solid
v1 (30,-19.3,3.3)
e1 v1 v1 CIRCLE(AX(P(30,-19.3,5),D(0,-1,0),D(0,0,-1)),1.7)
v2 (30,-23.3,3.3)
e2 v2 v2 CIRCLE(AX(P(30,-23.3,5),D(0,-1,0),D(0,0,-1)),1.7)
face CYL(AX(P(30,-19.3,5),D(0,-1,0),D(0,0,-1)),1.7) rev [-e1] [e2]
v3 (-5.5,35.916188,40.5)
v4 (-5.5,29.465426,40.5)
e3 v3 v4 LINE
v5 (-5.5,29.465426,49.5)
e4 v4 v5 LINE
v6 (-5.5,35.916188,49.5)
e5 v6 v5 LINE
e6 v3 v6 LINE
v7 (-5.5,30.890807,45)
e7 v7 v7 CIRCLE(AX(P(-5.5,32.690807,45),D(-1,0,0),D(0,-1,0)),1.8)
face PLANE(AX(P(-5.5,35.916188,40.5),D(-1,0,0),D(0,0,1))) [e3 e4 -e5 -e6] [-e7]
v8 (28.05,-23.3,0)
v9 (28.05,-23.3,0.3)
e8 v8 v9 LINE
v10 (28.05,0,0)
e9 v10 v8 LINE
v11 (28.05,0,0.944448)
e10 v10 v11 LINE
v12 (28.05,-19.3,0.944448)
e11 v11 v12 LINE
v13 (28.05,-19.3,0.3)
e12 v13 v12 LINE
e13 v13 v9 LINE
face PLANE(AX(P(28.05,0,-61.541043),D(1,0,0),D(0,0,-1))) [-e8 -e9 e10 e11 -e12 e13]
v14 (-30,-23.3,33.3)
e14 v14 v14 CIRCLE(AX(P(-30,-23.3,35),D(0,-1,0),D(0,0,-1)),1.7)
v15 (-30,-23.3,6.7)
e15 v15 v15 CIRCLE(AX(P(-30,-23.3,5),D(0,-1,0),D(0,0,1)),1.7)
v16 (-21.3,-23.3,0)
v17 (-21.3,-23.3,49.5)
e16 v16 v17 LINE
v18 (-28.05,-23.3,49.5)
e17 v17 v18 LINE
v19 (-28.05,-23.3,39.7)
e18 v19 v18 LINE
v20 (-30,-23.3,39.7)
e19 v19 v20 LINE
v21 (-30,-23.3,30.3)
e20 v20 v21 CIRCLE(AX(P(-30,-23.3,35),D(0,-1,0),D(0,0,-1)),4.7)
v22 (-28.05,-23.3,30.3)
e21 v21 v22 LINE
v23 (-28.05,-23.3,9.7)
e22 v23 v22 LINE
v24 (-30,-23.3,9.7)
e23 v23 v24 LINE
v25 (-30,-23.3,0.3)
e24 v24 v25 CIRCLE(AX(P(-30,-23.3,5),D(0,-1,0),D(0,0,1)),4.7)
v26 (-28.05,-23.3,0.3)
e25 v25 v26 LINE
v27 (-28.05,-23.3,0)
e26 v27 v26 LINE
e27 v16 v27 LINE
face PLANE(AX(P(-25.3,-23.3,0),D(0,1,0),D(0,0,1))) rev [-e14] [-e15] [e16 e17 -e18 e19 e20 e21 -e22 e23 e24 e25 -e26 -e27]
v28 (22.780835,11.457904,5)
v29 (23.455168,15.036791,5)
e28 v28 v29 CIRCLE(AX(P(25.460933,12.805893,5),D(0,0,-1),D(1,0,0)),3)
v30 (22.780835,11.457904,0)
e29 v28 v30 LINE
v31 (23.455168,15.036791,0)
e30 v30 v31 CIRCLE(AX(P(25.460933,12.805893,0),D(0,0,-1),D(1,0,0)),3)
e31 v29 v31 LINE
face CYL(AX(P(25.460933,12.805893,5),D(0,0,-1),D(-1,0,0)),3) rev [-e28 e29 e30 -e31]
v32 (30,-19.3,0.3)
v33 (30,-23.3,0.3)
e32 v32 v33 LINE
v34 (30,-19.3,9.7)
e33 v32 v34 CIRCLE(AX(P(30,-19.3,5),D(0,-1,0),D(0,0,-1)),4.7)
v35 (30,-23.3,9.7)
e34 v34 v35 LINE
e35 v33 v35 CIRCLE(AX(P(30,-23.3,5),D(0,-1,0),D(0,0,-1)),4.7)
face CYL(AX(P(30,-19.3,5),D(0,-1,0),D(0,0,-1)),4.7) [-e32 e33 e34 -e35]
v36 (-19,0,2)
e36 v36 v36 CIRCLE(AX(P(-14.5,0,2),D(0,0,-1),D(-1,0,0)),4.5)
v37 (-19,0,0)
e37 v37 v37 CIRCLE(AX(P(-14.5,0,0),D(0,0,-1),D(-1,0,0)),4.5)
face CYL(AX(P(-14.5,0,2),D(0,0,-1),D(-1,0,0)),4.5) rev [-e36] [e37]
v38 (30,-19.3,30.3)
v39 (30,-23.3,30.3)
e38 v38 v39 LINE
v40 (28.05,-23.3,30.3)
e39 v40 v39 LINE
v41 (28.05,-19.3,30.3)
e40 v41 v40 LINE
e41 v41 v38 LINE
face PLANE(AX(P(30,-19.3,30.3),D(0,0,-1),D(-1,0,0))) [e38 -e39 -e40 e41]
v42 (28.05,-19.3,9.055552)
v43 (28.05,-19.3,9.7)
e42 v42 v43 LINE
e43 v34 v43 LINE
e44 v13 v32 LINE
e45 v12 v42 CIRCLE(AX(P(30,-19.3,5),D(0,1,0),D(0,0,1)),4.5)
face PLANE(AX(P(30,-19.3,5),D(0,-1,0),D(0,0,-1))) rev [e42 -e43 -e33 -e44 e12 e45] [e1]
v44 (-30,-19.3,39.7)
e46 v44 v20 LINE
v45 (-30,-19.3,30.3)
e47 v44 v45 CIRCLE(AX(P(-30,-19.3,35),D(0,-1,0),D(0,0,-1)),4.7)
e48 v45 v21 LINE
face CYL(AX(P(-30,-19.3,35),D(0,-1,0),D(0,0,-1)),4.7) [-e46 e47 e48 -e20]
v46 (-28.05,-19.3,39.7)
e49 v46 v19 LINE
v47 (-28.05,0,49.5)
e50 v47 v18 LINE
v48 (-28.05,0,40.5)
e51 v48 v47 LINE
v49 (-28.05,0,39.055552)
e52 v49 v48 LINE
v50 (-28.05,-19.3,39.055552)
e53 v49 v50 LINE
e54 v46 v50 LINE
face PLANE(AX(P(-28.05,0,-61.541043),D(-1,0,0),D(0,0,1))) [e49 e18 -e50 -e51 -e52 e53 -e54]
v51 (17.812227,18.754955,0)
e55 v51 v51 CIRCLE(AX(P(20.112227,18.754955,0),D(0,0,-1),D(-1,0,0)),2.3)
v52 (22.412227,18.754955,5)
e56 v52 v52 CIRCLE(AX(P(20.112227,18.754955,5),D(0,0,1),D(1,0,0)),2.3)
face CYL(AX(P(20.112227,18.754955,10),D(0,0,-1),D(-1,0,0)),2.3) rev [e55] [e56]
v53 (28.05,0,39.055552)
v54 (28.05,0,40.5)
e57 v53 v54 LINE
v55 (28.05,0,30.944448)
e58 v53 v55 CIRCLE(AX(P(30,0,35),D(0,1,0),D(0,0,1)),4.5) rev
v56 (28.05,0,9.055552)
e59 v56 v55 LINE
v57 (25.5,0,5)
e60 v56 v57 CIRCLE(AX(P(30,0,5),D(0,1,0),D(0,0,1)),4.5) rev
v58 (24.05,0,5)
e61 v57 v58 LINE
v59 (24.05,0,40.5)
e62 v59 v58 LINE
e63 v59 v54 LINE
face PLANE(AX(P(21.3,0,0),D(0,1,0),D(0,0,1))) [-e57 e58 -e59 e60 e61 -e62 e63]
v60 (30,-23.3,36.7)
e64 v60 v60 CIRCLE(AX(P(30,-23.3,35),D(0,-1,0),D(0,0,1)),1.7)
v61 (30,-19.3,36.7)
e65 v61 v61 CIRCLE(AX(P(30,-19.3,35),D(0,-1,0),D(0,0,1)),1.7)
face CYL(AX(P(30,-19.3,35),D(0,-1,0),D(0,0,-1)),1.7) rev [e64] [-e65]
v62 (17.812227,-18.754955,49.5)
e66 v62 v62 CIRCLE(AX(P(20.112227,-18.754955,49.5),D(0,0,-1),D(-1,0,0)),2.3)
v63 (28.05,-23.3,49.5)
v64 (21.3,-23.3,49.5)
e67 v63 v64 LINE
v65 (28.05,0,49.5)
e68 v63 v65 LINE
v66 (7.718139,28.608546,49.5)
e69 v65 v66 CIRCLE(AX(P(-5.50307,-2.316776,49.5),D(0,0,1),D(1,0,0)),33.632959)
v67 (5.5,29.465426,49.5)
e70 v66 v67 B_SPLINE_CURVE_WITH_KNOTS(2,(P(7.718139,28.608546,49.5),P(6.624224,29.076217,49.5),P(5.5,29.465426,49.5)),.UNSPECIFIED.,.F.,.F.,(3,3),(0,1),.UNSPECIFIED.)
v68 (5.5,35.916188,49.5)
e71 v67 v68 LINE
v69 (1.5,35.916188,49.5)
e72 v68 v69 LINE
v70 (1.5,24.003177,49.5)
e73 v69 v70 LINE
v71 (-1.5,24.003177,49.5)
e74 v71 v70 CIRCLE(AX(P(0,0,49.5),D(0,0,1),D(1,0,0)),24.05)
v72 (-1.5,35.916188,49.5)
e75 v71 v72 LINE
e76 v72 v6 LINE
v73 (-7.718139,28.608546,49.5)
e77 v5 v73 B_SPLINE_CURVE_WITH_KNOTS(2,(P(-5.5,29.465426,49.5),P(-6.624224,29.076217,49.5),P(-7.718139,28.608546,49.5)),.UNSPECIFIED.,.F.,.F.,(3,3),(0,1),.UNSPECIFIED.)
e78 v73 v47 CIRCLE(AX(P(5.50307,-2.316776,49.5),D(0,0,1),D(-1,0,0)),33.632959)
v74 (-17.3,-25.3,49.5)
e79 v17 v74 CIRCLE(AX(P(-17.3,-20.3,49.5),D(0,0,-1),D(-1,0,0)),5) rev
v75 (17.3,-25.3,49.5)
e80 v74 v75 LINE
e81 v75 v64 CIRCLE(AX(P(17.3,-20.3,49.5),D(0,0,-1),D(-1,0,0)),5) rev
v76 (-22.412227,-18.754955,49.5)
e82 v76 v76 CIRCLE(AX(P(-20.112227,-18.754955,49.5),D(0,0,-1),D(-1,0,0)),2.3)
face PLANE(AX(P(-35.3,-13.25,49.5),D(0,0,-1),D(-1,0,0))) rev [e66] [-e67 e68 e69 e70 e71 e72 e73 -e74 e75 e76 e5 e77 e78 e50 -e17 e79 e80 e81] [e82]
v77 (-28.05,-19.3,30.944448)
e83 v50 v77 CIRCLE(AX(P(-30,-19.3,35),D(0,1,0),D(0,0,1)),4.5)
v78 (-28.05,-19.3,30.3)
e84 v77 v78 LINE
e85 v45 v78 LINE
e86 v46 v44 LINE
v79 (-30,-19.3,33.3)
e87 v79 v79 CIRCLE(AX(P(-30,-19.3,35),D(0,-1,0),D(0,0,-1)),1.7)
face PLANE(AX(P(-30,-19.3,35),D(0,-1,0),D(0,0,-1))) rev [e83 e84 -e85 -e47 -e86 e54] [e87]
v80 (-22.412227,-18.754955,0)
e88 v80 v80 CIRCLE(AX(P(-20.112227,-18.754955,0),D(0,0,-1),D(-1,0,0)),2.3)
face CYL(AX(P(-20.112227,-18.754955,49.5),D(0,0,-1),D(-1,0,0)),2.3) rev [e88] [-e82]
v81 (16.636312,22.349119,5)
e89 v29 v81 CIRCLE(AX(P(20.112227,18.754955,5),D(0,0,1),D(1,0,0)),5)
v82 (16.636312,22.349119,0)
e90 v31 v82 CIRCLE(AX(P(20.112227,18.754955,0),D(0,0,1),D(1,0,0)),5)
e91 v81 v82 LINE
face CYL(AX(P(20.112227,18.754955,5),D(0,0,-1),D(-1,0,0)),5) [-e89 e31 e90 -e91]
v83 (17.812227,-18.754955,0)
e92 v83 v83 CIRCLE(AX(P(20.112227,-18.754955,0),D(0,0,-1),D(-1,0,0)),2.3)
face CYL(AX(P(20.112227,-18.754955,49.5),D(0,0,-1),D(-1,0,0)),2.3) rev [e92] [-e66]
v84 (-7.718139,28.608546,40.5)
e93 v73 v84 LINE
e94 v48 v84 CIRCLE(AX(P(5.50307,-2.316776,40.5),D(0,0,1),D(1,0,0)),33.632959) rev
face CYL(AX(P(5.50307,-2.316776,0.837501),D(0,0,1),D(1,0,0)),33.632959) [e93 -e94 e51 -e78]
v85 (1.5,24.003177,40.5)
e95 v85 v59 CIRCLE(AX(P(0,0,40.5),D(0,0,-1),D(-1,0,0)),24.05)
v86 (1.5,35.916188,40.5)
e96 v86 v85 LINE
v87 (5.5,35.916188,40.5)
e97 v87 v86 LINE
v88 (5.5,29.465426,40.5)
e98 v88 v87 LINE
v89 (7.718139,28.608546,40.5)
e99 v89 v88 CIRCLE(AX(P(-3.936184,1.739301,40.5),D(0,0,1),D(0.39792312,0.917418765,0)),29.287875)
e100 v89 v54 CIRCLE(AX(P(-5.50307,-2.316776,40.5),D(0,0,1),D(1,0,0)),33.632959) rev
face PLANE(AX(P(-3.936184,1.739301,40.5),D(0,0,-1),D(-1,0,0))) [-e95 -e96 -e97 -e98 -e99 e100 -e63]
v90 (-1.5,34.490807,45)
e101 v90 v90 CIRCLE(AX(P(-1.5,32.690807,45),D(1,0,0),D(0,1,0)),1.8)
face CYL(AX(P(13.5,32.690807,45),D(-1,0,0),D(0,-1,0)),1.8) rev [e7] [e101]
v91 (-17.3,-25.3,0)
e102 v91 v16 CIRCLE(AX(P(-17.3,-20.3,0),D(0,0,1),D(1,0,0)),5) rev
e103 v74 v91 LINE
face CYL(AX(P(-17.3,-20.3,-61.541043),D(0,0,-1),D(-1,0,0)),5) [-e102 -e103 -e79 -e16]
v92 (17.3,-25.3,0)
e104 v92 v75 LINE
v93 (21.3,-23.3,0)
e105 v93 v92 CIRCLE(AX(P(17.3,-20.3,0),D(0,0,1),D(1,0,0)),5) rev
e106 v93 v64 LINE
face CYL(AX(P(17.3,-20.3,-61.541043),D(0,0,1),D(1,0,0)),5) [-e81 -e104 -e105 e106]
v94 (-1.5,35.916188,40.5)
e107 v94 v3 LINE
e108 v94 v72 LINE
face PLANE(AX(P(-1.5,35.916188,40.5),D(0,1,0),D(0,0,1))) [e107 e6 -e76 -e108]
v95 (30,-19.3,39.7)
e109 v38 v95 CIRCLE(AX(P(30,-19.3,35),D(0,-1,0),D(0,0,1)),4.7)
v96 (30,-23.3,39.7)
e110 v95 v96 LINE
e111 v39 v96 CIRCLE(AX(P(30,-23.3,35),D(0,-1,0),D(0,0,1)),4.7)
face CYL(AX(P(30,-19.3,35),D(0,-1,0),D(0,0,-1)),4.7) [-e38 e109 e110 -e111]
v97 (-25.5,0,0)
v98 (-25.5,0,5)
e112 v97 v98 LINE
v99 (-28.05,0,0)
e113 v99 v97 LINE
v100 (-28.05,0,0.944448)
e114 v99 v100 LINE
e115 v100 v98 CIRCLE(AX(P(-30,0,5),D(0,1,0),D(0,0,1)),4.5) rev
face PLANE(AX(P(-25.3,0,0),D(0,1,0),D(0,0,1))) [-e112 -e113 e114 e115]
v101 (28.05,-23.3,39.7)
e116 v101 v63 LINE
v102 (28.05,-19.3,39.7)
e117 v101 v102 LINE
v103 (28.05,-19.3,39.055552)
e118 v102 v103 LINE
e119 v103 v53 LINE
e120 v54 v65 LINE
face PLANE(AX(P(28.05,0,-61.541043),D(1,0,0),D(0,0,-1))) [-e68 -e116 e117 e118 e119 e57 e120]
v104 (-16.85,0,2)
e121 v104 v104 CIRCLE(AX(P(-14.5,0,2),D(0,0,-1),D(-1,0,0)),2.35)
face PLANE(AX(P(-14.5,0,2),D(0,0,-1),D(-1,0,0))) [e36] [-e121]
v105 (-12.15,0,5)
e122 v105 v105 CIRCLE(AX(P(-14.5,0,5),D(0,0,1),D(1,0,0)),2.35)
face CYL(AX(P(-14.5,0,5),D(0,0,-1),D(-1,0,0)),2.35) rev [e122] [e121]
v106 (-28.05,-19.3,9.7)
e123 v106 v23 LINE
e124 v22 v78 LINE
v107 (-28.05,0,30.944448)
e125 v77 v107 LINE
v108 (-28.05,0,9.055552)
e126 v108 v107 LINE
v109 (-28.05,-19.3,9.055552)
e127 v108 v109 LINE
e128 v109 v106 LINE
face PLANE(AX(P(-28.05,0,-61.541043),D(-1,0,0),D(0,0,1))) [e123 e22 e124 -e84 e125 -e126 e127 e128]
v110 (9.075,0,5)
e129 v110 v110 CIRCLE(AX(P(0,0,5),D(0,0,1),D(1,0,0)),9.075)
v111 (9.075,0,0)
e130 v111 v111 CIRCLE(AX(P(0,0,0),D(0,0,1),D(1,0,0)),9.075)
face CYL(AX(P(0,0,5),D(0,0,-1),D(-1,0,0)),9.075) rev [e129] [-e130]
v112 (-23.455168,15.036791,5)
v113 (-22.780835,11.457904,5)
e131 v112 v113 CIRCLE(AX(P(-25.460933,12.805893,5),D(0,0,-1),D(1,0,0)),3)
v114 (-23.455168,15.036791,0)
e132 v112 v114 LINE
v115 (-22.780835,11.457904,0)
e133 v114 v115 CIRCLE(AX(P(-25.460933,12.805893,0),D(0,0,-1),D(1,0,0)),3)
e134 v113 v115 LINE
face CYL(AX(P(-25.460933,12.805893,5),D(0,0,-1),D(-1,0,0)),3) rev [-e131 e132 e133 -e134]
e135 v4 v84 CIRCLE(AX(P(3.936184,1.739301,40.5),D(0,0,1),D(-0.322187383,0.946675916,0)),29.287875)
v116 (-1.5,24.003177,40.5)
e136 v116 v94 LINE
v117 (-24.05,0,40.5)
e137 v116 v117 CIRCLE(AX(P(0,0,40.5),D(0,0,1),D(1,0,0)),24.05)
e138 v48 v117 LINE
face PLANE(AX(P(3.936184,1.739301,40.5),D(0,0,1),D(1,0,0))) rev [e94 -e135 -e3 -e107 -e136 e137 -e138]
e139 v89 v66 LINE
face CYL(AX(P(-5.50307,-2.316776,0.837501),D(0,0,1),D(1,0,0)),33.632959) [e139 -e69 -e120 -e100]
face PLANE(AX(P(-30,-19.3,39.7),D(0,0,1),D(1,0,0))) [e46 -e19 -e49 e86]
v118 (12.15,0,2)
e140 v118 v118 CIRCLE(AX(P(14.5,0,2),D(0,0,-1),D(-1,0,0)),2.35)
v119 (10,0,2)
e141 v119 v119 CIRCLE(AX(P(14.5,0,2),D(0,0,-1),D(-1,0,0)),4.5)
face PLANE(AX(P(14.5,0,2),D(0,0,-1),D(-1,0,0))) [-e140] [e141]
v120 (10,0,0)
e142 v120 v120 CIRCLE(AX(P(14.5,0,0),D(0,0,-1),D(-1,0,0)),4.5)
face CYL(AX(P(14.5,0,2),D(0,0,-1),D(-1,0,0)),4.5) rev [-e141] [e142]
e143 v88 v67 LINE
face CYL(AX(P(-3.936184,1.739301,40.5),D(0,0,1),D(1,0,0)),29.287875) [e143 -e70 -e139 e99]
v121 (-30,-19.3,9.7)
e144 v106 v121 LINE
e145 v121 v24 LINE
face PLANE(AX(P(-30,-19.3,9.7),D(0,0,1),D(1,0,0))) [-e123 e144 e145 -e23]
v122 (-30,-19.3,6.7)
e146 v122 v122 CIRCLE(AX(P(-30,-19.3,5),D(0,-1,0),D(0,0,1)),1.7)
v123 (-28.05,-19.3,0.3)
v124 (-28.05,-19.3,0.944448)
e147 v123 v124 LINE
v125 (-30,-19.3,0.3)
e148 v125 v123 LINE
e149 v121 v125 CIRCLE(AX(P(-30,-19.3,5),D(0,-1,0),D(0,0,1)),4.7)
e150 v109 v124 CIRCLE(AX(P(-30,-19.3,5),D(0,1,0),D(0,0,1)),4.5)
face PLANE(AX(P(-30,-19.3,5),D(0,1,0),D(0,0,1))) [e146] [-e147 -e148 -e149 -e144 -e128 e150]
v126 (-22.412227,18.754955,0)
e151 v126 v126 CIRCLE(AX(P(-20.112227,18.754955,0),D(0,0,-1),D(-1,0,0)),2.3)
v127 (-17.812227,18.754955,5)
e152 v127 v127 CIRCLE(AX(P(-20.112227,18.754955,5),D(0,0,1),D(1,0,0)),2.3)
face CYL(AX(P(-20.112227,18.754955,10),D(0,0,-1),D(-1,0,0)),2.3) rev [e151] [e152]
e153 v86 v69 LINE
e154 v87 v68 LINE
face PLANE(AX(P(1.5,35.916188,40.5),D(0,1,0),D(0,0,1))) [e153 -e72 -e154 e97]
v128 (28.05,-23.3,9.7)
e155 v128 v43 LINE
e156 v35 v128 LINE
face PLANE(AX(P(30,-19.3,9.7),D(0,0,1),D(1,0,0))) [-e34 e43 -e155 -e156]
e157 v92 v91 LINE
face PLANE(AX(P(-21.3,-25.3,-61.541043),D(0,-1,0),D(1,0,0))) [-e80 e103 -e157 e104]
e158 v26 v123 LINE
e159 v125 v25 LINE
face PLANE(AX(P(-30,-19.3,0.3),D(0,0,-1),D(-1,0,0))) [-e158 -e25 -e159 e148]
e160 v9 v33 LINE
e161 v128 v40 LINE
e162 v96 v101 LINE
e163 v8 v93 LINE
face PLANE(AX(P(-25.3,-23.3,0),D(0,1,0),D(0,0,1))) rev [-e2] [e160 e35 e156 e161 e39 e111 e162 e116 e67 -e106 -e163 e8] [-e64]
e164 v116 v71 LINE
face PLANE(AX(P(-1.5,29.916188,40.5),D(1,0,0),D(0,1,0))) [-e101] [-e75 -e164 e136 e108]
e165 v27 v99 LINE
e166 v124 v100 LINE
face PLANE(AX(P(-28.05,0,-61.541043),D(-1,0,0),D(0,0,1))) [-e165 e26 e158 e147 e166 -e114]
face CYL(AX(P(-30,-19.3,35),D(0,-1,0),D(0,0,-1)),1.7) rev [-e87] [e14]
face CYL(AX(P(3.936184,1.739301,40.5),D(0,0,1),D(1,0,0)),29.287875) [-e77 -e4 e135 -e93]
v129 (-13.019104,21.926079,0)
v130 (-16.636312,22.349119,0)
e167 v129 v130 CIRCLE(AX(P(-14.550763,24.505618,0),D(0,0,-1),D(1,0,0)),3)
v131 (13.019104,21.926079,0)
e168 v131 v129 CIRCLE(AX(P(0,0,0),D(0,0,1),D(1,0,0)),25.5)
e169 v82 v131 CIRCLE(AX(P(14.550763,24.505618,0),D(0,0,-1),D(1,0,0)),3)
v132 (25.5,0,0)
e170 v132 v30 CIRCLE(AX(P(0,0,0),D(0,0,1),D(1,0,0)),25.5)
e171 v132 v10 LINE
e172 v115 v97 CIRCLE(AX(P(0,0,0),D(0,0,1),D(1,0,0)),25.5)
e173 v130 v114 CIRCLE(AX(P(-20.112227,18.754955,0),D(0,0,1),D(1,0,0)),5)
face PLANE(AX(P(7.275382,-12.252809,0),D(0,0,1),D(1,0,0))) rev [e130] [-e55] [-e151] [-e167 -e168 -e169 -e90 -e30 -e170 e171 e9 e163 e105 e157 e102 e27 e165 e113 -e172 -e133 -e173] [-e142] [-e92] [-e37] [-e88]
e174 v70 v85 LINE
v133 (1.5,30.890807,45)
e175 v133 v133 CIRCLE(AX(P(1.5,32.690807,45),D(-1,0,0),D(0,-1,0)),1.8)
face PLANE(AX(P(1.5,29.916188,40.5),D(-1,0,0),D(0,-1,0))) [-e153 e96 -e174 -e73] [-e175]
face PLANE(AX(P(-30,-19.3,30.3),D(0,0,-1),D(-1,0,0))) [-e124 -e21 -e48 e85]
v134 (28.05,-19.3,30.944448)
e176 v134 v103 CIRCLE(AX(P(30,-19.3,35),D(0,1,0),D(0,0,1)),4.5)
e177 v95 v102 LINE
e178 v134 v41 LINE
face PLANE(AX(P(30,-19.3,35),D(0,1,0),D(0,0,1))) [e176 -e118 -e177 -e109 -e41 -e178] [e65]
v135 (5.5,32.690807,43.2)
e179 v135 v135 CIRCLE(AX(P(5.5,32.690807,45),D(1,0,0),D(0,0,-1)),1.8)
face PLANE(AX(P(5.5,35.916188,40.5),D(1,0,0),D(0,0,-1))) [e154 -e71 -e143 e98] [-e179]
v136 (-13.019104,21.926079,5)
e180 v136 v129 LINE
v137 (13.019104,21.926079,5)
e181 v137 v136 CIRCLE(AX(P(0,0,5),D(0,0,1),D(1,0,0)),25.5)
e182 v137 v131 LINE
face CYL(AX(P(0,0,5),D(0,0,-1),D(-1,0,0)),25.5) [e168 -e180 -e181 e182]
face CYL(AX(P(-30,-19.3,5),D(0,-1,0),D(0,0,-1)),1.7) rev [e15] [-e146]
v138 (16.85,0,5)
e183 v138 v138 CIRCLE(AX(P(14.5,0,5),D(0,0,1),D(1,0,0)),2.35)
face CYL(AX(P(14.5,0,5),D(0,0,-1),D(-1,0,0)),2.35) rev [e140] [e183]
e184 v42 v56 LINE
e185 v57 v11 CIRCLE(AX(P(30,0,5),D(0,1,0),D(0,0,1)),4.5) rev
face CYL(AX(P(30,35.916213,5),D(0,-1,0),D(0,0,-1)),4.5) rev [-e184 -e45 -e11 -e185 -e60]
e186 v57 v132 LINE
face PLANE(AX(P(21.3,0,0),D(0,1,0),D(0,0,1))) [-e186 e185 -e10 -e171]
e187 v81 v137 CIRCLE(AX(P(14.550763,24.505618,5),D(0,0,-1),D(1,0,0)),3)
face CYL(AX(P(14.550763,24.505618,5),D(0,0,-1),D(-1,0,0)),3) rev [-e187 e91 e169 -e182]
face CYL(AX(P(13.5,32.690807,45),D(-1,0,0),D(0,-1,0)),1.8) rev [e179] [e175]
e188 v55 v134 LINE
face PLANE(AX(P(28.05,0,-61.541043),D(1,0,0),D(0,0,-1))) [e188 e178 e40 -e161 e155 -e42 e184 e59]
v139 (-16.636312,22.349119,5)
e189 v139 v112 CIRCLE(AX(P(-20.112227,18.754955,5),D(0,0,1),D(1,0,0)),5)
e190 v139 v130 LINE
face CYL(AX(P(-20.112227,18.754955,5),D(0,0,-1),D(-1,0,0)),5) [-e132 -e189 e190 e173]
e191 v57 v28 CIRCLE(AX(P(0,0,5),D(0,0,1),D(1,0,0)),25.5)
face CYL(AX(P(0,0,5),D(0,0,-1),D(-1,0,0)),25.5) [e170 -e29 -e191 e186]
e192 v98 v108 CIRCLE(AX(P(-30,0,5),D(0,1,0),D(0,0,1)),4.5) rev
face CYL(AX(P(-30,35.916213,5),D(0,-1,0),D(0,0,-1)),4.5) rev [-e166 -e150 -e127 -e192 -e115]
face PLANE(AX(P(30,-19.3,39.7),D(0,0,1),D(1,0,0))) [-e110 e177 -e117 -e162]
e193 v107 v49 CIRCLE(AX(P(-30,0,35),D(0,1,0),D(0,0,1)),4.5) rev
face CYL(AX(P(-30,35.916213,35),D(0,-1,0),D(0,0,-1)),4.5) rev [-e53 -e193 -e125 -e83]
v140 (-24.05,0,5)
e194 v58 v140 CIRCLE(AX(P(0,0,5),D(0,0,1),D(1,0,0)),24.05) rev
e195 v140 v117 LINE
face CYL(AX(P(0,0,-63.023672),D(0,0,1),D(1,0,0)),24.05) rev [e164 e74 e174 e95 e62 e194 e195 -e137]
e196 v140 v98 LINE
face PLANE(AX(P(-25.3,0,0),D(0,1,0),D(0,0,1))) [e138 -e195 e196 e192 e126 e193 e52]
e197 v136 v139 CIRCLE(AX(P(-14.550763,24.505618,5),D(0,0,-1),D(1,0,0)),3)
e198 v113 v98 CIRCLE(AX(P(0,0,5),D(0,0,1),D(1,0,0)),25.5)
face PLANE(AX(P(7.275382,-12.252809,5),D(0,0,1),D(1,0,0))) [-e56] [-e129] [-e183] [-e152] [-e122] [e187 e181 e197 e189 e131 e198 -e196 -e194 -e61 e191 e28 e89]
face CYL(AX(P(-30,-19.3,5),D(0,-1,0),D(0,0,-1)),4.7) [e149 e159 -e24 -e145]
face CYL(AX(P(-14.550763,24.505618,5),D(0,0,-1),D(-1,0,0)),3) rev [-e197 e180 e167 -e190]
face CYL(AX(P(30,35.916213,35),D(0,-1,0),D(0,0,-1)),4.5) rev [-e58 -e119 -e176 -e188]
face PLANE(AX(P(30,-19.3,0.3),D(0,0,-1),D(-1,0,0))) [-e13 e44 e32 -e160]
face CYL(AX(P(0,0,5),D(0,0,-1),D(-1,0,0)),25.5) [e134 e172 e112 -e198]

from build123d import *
from build123d.topology import SkipClean

# Parameters (mm, degrees)
SKETCH_1_R               = 2.35
SKETCH_1_R_2             = 9.075
EXTRUDE_1_DEPTH          = 5
EXTRUDE_2_DEPTH          = 44.5
EXTRUDE_2_DEPTH_BACK     = 5
EXTRUDE_START            = -9
EXTRUDE_3_DEPTH          = 9
SKETCH_5_R               = 1.8
CUT_EXTRUDE_2_DEPTH      = 19
CUT_EXTRUDE_5_DEPTH      = 10
CUT_EXTRUDE_5_DEPTH_BACK = 10
SKETCH_9_W               = 118.709111843
SKETCH_9_H               = 68.105929764
SKETCH_9_W_2             = 50.6
SKETCH_9_H_2             = 49.5
SKETCH_10_W              = 50.6
SKETCH_10_H              = 4.95
CUT_EXTRUDE_6_DEPTH      = 67.26064134
SKETCH_11_R              = 2.3
CUT_EXTRUDE_7_DEPTH      = 67.26064134
SKETCH_12_R              = 2.3
CUT_EXTRUDE_8_DEPTH      = 10
SKETCH_13_R              = 4.5
CUT_EXTRUDE_9_DEPTH      = 2
SKETCH_14_R              = 1.7
EXTRUDE_4_DEPTH          = 4
CUT_EXTRUDE_10_REACH     = 72.316
SKETCH_15_R              = 24.05
EXTRUDE_5_REACH          = 72.316
SKETCH_17_R              = 2.3
EXTRUDE_6_DEPTH          = 9
SKETCH_19_R              = 4.5
CUT_EXTRUDE_11_DEPTH     = 82.872873798
EXTRUDE_7_DEPTH          = 5
FILLET_2_R               = 5


with BuildPart() as part:
    # Эскиз1 → Бобышка-Вытянуть1 (new body)
    with BuildSketch(Plane.XY):
        with BuildLine():
            ThreePointArc((-13.019103812, -21.9260789), (-14.899244328, -21.525926197), (-16.636311976, -22.349119084))
            ThreePointArc((-16.636311976, -22.349119084), (-23.768995303, -22.164946702), (-23.455168213, -15.036791017))
            ThreePointArc((-23.455168213, -15.036791017), (-22.512808868, -13.361377812), (-22.780834847, -11.457903983))
            ThreePointArc((-22.780834847, -11.457903983), (-25.5, 0), (-22.780834847, 11.457903983))
            ThreePointArc((-22.780834847, 11.457903983), (-22.512808868, 13.361377812), (-23.455168213, 15.036791017))
            ThreePointArc((-23.455168213, 15.036791017), (-23.768995303, 22.164946702), (-16.636311976, 22.349119084))
            ThreePointArc((-16.636311976, 22.349119084), (-14.899244328, 21.525926197), (-13.019103812, 21.9260789))
            ThreePointArc((-13.019103812, 21.9260789), (0, 25.5), (13.019103812, 21.9260789))
            ThreePointArc((13.019103812, 21.9260789), (14.899244328, 21.525926197), (16.636311976, 22.349119084))
            ThreePointArc((16.636311976, 22.349119084), (23.768995303, 22.164946702), (23.455168213, 15.036791017))
            ThreePointArc((23.455168213, 15.036791017), (22.512808868, 13.361377812), (22.780834847, 11.457903983))
            ThreePointArc((22.780834847, 11.457903983), (25.5, 0), (22.780834847, -11.457903983))
            ThreePointArc((22.780834847, -11.457903983), (22.512808868, -13.361377812), (23.455168213, -15.036791017))
            ThreePointArc((23.455168213, -15.036791017), (23.768995303, -22.164946702), (16.636311976, -22.349119084))
            ThreePointArc((16.636311976, -22.349119084), (14.899244328, -21.525926197), (13.019103812, -21.9260789))
            ThreePointArc((13.019103812, -21.9260789), (0, -25.5), (-13.019103812, -21.9260789))
        make_face()
        with Locations((-14.5, 0)):
            Circle(SKETCH_1_R, mode=Mode.SUBTRACT)
        with Locations((14.5, 0)):
            Circle(SKETCH_1_R, mode=Mode.SUBTRACT)
        Circle(SKETCH_1_R_2, mode=Mode.SUBTRACT)
    extrude(amount=EXTRUDE_1_DEPTH)

    # Эскиз2 → Бобышка-Вытянуть2 (add, two sides: drawn at the far end of the back side and taken through both)
    with BuildSketch(Plane.XY.offset(5).offset(-EXTRUDE_2_DEPTH_BACK)):
        with BuildLine():
            Line((-25.3, 0), (-21.3, 0))
            ThreePointArc((-21.3, 0), (0, -21.3), (21.3, 0))
            Line((21.3, 0), (25.3, 0))
            Line((25.3, 0), (25.3, -13.25))
            ThreePointArc((25.3, -13.25), (28.228932188, -20.321067812), (35.3, -23.25))
            Line((35.3, -23.25), (50, -23.25))
            Line((50, -23.25), (50, -28.25))
            Line((50, -28.25), (-50, -28.25))
            Line((-50, -28.25), (-50, -23.25))
            Line((-50, -23.25), (-35.3, -23.25))
            ThreePointArc((-35.3, -23.25), (-28.228932188, -20.321067812), (-25.3, -13.25))
            Line((-25.3, -13.25), (-25.3, 0))
        make_face()
    extrude(amount=EXTRUDE_2_DEPTH + EXTRUDE_2_DEPTH_BACK)

    # Эскиз4 → Бобышка-Вытянуть3 (add)
    with SkipClean():  # the faces are left unmerged after this step: merging them gives an invalid solid
        with BuildSketch(Plane.XY.offset(49.5).offset(EXTRUDE_START)):
            with BuildLine():
                Line((21.3, 0), (25.3, 0))
                ThreePointArc((25.3, 0), (20.373090978, 18.07450089), (5.5, 29.465426213))
                Line((5.5, 29.465426213), (5.5, 35.916188423))
                Line((5.5, 35.916188423), (1.5, 35.916188423))
                Line((1.5, 35.916188423), (1.5, 29.916188423))
                Line((1.5, 29.916188423), (1.5, 21.247117452))
                ThreePointArc((1.5, 21.247117452), (15.582682696, 14.521363572), (21.3, 0))
            make_face()
            with BuildLine():
                Line((-25.3, 0), (-21.3, 0))
                ThreePointArc((-21.3, 0), (-15.582682696, 14.521363572), (-1.5, 21.247117452))
                Line((-1.5, 21.247117452), (-1.5, 29.916188423))
                Line((-1.5, 29.916188423), (-1.5, 35.916188423))
                Line((-1.5, 35.916188423), (-5.5, 35.916188423))
                Line((-5.5, 35.916188423), (-5.5, 29.465426213))
                ThreePointArc((-5.5, 29.465426213), (-20.373090978, 18.07450089), (-25.3, 0))
            make_face()
        extrude(amount=EXTRUDE_3_DEPTH)

    # Эскиз5 → Вырез-Вытянуть2 (cut)
    with SkipClean():  # the faces are left unmerged after this step: merging them gives an invalid solid
        with BuildSketch(Plane.ZY.offset(5.5)):
            with Locations(Location((45, 32.690807318, 0), (0, 0, 270))):
                Circle(SKETCH_5_R)
        extrude(amount=-CUT_EXTRUDE_2_DEPTH, mode=Mode.SUBTRACT)

    # Эскиз9 → Вырез-Вытянуть5 (cut, two sides: drawn at the far end of the back side and taken through both)
    with SkipClean():  # the faces are left unmerged after this step: merging them gives an invalid solid
        with BuildSketch(Plane(origin=(0, -23.25, 0), x_dir=(1, 0, 0), z_dir=(0, 1, 0)).offset(-CUT_EXTRUDE_5_DEPTH_BACK)):
            with Locations((-0.535798399, -23.678403203)):
                Rectangle(SKETCH_9_W, SKETCH_9_H)
            with Locations((0, -24.75)):
                Rectangle(SKETCH_9_W_2, SKETCH_9_H_2, mode=Mode.SUBTRACT)
        extrude(amount=CUT_EXTRUDE_5_DEPTH + CUT_EXTRUDE_5_DEPTH_BACK, mode=Mode.SUBTRACT)

    # Эскиз10 → Вырез-Вытянуть6 (cut, through all)
    with SkipClean():  # the faces are left unmerged after this step: merging them gives an invalid solid
        with BuildSketch(Plane.XY.offset(49.5)):
            with Locations((0, -25.775)):
                Rectangle(SKETCH_10_W, SKETCH_10_H)
        extrude(amount=-CUT_EXTRUDE_6_DEPTH, mode=Mode.SUBTRACT)

    # Эскиз11 → Вырез-Вытянуть7 (cut, through all)
    with SkipClean():  # the faces are left unmerged after this step: merging them gives an invalid solid
        with BuildSketch(Plane(origin=(0, 0, 0), x_dir=(-1, 0, 0), z_dir=(0, 0, -1))):
            with Locations((-20.112226795, -18.754954902)):
                Circle(SKETCH_11_R)
            with Locations((20.112226795, -18.754954902)):
                Circle(SKETCH_11_R)
        extrude(amount=-CUT_EXTRUDE_7_DEPTH, mode=Mode.SUBTRACT)

    # Эскиз12 → Вырез-Вытянуть8 (cut)
    with SkipClean():  # the faces are left unmerged after this step: merging them gives an invalid solid
        with BuildSketch(Plane(origin=(0, 0, 0), x_dir=(-1, 0, 0), z_dir=(0, 0, -1))):
            with Locations((-20.112226795, 18.754954902)):
                Circle(SKETCH_12_R)
            with Locations((20.112226795, 18.754954902)):
                Circle(SKETCH_12_R)
        extrude(amount=-CUT_EXTRUDE_8_DEPTH, mode=Mode.SUBTRACT)

    # Эскиз13 → Вырез-Вытянуть9 (cut)
    with SkipClean():  # the faces are left unmerged after this step: merging them gives an invalid solid
        with BuildSketch(Plane(origin=(0, 0, 0), x_dir=(-1, 0, 0), z_dir=(0, 0, -1))):
            with Locations((-14.5, 0)):
                Circle(SKETCH_13_R)
            with Locations((14.5, 0)):
                Circle(SKETCH_13_R)
        extrude(amount=-CUT_EXTRUDE_9_DEPTH, mode=Mode.SUBTRACT)

    # Эскиз14 → Бобышка-Вытянуть4 (add)
    # profile 1 of 4: a face of its own
    with SkipClean():  # the faces are left unmerged after this step: merging them gives an invalid solid
        with BuildSketch(Plane.XZ.offset(23.3)):
            with BuildLine():
                Line((-30, 39.7), (-25.3, 39.7))
                Line((-25.3, 39.7), (-25.3, 30.3))
                Line((-25.3, 30.3), (-30, 30.3))
                ThreePointArc((-30, 30.3), (-34.7, 35), (-30, 39.7))
            make_face()
            with Locations(Location((-30, 35, 0), (0, 0, 270))):
                Circle(SKETCH_14_R, mode=Mode.SUBTRACT)
        # profile 2 of 4: a face of its own
        with BuildSketch(Plane.XZ.offset(23.3)):
            with BuildLine():
                Line((25.3, 39.7), (25.3, 30.3))
                Line((25.3, 30.3), (30, 30.3))
                ThreePointArc((30, 30.3), (34.7, 35), (30, 39.7))
                Line((30, 39.7), (25.3, 39.7))
            make_face()
            with Locations(Location((30, 35, 0), (0, 0, 90))):
                Circle(SKETCH_14_R, mode=Mode.SUBTRACT)
        # profile 3 of 4: a face of its own
        with BuildSketch(Plane.XZ.offset(23.3)):
            with BuildLine():
                Line((30, 0.3), (25.3, 0.3))
                Line((25.3, 0.3), (25.3, 9.7))
                Line((25.3, 9.7), (30, 9.7))
                ThreePointArc((30, 9.7), (34.7, 5), (30, 0.3))
            make_face()
            with Locations(Location((30, 5, 0), (0, 0, 270))):
                Circle(SKETCH_14_R, mode=Mode.SUBTRACT)
        # profile 4 of 4: a face of its own
        with BuildSketch(Plane.XZ.offset(23.3)):
            with BuildLine():
                Line((-25.3, 0.3), (-25.3, 9.7))
                Line((-25.3, 9.7), (-30, 9.7))
                ThreePointArc((-30, 9.7), (-34.7, 5), (-30, 0.3))
                Line((-30, 0.3), (-25.3, 0.3))
            make_face()
            with Locations(Location((-30, 5, 0), (0, 0, 90))):
                Circle(SKETCH_14_R, mode=Mode.SUBTRACT)
        extrude(amount=-EXTRUDE_4_DEPTH)

    # Вырез-Вытянуть10: up to this face of the body (flat: up to its plane)
    cut_extrude_10_end = Plane(part.part.faces().sort_by_distance((24.448756795, 4.205453076, 5))[0])
    # Эскиз15 → Вырез-Вытянуть10 (cut, up to the picked face)
    with BuildSketch(Plane.XY.offset(49.5), mode=Mode.PRIVATE) as cut_extrude_10_sk1:
        Circle(SKETCH_15_R)
    cut_extrude_10_tool1 = split(extrude(cut_extrude_10_sk1.sketch, amount=-CUT_EXTRUDE_10_REACH, mode=Mode.PRIVATE), bisect_by=cut_extrude_10_end, keep=Keep.BOTH, mode=Mode.PRIVATE)
    add(cut_extrude_10_tool1.solids().sort_by(Axis((0, 0, 49.5), (0, 0, -1)))[0], mode=Mode.SUBTRACT)

    # Бобышка-Вытянуть5: up to this face of the body (flat: up to its plane)
    extrude_5_end = Plane(part.part.faces().sort_by_distance((-24.435278563, 4.203134673, 0))[0])
    # Эскиз17 → Бобышка-Вытянуть5 (add, up to the picked face)
    with BuildSketch(Plane.XY.offset(49.5), mode=Mode.PRIVATE) as extrude_5_sk1:
        with BuildLine():
            Line((24.05, 0), (28.05, 0))
            Line((28.05, 0), (28.05, -23.3))
            Line((28.05, -23.3), (21.3, -23.3))
            Line((21.3, -23.3), (21.3, -25.3))
            Line((21.3, -25.3), (-21.3, -25.3))
            Line((-21.3, -25.3), (-21.3, -23.3))
            Line((-21.3, -23.3), (-28.05, -23.3))
            Line((-28.05, -23.3), (-28.05, 0))
            Line((-28.05, 0), (-24.05, 0))
            ThreePointArc((-24.05, 0), (0, -24.05), (24.05, 0))
        make_face()
        with Locations(Location((20.112226795, -18.754954902, 0), (0, 0, 180))):
            Circle(SKETCH_17_R, mode=Mode.SUBTRACT)
        with Locations(Location((-20.112226795, -18.754954902, 0), (0, 0, 180))):
            Circle(SKETCH_17_R, mode=Mode.SUBTRACT)
    extrude_5_tool1 = split(extrude(extrude_5_sk1.sketch, amount=-EXTRUDE_5_REACH, mode=Mode.PRIVATE), bisect_by=extrude_5_end, keep=Keep.BOTH, mode=Mode.PRIVATE)
    add(extrude_5_tool1.solids().sort_by(Axis((26.05, -0.61541, 49.5), (0, 0, -1)))[0])

    # Эскиз18 → Бобышка-Вытянуть6 (add)
    with BuildSketch(Plane.XY.offset(49.5)):
        with BuildLine():
            Line((-24.05, 0), (-28.05, 0))
            ThreePointArc((-28.05, 0), (-21.205828195, 18.123642363), (-5.5, 29.465426213))
            Line((-5.5, 29.465426213), (-1.5, 24.003176873))
            ThreePointArc((-1.5, 24.003176873), (-17.528227235, 16.467050434), (-24.05, 0))
        make_face()
        with BuildLine():
            Line((5.5, 29.465426213), (1.5, 24.003176873))
            ThreePointArc((1.5, 24.003176873), (17.528227235, 16.467050434), (24.05, 0))
            Line((24.05, 0), (28.05, 0))
            ThreePointArc((28.05, 0), (21.205828195, 18.123642363), (5.5, 29.465426213))
        make_face()
    extrude(amount=-EXTRUDE_6_DEPTH)

    # Эскиз19 → Вырез-Вытянуть11 (cut, through all)
    with BuildSketch(Plane(origin=(0, -19.3, 0), x_dir=(1, 0, 0), z_dir=(0, 1, 0))):
        with Locations((30, -5)):
            Circle(SKETCH_19_R)
        with Locations((30, -35)):
            Circle(SKETCH_19_R)
        with Locations((-30, -35)):
            Circle(SKETCH_19_R)
        with Locations((-30, -5)):
            Circle(SKETCH_19_R)
    extrude(amount=CUT_EXTRUDE_11_DEPTH, mode=Mode.SUBTRACT)

    # Эскиз20 → Бобышка-Вытянуть7 (add)
    with BuildSketch(Plane.XY.offset(5)):
        with BuildLine():
            Line((-14.981750785, -18.813549464), (15.898564469, -18.045446734))
            ThreePointArc((15.898564469, -18.045446734), (0.598023648, -24.042563668), (-14.981750785, -18.813549464))
        make_face()
    extrude(amount=-EXTRUDE_7_DEPTH)

    # Скругление2
    # the kernel refuses this fillet: 5 mm, written as the material it takes off along each edge
    with BuildSketch(Plane(origin=(21.3, -25.3, 59.5), x_dir=(-1, 0, 0), z_dir=(0, 0, -1))) as fillet_2_piece_1:
        with BuildLine():
            CenterArc((4, 5), FILLET_2_R, 216.869897646, 53.130102354)
            Line((0, 2), (-0.08, 1.94))
            ThreePointArc((-0.08, 1.94), (-0.1, 1), (-0.1, 0))
            Line((-0.1, 0), (0, -0.1))
            Line((0, -0.1), (4, -0.1))
            Line((4, -0.1), (4, 0))
        make_face()
    extrude(amount=69.5, mode=Mode.SUBTRACT)
    with BuildSketch(Plane(origin=(-21.3, -25.3, 59.5), x_dir=(0, 1, 0), z_dir=(0, 0, -1))) as fillet_2_piece_2:
        with BuildLine():
            CenterArc((5, 4), FILLET_2_R, 180, 53.130102354)
            Line((0, 4), (-0.1, 4))
            Line((-0.1, 4), (-0.1, 0))
            Line((-0.1, 0), (0, -0.1))
            ThreePointArc((0, -0.1), (1, -0.1), (1.94, -0.08))
            Line((1.94, -0.08), (2, 0))
        make_face()
    extrude(amount=69.5, mode=Mode.SUBTRACT)


solid = part.part
